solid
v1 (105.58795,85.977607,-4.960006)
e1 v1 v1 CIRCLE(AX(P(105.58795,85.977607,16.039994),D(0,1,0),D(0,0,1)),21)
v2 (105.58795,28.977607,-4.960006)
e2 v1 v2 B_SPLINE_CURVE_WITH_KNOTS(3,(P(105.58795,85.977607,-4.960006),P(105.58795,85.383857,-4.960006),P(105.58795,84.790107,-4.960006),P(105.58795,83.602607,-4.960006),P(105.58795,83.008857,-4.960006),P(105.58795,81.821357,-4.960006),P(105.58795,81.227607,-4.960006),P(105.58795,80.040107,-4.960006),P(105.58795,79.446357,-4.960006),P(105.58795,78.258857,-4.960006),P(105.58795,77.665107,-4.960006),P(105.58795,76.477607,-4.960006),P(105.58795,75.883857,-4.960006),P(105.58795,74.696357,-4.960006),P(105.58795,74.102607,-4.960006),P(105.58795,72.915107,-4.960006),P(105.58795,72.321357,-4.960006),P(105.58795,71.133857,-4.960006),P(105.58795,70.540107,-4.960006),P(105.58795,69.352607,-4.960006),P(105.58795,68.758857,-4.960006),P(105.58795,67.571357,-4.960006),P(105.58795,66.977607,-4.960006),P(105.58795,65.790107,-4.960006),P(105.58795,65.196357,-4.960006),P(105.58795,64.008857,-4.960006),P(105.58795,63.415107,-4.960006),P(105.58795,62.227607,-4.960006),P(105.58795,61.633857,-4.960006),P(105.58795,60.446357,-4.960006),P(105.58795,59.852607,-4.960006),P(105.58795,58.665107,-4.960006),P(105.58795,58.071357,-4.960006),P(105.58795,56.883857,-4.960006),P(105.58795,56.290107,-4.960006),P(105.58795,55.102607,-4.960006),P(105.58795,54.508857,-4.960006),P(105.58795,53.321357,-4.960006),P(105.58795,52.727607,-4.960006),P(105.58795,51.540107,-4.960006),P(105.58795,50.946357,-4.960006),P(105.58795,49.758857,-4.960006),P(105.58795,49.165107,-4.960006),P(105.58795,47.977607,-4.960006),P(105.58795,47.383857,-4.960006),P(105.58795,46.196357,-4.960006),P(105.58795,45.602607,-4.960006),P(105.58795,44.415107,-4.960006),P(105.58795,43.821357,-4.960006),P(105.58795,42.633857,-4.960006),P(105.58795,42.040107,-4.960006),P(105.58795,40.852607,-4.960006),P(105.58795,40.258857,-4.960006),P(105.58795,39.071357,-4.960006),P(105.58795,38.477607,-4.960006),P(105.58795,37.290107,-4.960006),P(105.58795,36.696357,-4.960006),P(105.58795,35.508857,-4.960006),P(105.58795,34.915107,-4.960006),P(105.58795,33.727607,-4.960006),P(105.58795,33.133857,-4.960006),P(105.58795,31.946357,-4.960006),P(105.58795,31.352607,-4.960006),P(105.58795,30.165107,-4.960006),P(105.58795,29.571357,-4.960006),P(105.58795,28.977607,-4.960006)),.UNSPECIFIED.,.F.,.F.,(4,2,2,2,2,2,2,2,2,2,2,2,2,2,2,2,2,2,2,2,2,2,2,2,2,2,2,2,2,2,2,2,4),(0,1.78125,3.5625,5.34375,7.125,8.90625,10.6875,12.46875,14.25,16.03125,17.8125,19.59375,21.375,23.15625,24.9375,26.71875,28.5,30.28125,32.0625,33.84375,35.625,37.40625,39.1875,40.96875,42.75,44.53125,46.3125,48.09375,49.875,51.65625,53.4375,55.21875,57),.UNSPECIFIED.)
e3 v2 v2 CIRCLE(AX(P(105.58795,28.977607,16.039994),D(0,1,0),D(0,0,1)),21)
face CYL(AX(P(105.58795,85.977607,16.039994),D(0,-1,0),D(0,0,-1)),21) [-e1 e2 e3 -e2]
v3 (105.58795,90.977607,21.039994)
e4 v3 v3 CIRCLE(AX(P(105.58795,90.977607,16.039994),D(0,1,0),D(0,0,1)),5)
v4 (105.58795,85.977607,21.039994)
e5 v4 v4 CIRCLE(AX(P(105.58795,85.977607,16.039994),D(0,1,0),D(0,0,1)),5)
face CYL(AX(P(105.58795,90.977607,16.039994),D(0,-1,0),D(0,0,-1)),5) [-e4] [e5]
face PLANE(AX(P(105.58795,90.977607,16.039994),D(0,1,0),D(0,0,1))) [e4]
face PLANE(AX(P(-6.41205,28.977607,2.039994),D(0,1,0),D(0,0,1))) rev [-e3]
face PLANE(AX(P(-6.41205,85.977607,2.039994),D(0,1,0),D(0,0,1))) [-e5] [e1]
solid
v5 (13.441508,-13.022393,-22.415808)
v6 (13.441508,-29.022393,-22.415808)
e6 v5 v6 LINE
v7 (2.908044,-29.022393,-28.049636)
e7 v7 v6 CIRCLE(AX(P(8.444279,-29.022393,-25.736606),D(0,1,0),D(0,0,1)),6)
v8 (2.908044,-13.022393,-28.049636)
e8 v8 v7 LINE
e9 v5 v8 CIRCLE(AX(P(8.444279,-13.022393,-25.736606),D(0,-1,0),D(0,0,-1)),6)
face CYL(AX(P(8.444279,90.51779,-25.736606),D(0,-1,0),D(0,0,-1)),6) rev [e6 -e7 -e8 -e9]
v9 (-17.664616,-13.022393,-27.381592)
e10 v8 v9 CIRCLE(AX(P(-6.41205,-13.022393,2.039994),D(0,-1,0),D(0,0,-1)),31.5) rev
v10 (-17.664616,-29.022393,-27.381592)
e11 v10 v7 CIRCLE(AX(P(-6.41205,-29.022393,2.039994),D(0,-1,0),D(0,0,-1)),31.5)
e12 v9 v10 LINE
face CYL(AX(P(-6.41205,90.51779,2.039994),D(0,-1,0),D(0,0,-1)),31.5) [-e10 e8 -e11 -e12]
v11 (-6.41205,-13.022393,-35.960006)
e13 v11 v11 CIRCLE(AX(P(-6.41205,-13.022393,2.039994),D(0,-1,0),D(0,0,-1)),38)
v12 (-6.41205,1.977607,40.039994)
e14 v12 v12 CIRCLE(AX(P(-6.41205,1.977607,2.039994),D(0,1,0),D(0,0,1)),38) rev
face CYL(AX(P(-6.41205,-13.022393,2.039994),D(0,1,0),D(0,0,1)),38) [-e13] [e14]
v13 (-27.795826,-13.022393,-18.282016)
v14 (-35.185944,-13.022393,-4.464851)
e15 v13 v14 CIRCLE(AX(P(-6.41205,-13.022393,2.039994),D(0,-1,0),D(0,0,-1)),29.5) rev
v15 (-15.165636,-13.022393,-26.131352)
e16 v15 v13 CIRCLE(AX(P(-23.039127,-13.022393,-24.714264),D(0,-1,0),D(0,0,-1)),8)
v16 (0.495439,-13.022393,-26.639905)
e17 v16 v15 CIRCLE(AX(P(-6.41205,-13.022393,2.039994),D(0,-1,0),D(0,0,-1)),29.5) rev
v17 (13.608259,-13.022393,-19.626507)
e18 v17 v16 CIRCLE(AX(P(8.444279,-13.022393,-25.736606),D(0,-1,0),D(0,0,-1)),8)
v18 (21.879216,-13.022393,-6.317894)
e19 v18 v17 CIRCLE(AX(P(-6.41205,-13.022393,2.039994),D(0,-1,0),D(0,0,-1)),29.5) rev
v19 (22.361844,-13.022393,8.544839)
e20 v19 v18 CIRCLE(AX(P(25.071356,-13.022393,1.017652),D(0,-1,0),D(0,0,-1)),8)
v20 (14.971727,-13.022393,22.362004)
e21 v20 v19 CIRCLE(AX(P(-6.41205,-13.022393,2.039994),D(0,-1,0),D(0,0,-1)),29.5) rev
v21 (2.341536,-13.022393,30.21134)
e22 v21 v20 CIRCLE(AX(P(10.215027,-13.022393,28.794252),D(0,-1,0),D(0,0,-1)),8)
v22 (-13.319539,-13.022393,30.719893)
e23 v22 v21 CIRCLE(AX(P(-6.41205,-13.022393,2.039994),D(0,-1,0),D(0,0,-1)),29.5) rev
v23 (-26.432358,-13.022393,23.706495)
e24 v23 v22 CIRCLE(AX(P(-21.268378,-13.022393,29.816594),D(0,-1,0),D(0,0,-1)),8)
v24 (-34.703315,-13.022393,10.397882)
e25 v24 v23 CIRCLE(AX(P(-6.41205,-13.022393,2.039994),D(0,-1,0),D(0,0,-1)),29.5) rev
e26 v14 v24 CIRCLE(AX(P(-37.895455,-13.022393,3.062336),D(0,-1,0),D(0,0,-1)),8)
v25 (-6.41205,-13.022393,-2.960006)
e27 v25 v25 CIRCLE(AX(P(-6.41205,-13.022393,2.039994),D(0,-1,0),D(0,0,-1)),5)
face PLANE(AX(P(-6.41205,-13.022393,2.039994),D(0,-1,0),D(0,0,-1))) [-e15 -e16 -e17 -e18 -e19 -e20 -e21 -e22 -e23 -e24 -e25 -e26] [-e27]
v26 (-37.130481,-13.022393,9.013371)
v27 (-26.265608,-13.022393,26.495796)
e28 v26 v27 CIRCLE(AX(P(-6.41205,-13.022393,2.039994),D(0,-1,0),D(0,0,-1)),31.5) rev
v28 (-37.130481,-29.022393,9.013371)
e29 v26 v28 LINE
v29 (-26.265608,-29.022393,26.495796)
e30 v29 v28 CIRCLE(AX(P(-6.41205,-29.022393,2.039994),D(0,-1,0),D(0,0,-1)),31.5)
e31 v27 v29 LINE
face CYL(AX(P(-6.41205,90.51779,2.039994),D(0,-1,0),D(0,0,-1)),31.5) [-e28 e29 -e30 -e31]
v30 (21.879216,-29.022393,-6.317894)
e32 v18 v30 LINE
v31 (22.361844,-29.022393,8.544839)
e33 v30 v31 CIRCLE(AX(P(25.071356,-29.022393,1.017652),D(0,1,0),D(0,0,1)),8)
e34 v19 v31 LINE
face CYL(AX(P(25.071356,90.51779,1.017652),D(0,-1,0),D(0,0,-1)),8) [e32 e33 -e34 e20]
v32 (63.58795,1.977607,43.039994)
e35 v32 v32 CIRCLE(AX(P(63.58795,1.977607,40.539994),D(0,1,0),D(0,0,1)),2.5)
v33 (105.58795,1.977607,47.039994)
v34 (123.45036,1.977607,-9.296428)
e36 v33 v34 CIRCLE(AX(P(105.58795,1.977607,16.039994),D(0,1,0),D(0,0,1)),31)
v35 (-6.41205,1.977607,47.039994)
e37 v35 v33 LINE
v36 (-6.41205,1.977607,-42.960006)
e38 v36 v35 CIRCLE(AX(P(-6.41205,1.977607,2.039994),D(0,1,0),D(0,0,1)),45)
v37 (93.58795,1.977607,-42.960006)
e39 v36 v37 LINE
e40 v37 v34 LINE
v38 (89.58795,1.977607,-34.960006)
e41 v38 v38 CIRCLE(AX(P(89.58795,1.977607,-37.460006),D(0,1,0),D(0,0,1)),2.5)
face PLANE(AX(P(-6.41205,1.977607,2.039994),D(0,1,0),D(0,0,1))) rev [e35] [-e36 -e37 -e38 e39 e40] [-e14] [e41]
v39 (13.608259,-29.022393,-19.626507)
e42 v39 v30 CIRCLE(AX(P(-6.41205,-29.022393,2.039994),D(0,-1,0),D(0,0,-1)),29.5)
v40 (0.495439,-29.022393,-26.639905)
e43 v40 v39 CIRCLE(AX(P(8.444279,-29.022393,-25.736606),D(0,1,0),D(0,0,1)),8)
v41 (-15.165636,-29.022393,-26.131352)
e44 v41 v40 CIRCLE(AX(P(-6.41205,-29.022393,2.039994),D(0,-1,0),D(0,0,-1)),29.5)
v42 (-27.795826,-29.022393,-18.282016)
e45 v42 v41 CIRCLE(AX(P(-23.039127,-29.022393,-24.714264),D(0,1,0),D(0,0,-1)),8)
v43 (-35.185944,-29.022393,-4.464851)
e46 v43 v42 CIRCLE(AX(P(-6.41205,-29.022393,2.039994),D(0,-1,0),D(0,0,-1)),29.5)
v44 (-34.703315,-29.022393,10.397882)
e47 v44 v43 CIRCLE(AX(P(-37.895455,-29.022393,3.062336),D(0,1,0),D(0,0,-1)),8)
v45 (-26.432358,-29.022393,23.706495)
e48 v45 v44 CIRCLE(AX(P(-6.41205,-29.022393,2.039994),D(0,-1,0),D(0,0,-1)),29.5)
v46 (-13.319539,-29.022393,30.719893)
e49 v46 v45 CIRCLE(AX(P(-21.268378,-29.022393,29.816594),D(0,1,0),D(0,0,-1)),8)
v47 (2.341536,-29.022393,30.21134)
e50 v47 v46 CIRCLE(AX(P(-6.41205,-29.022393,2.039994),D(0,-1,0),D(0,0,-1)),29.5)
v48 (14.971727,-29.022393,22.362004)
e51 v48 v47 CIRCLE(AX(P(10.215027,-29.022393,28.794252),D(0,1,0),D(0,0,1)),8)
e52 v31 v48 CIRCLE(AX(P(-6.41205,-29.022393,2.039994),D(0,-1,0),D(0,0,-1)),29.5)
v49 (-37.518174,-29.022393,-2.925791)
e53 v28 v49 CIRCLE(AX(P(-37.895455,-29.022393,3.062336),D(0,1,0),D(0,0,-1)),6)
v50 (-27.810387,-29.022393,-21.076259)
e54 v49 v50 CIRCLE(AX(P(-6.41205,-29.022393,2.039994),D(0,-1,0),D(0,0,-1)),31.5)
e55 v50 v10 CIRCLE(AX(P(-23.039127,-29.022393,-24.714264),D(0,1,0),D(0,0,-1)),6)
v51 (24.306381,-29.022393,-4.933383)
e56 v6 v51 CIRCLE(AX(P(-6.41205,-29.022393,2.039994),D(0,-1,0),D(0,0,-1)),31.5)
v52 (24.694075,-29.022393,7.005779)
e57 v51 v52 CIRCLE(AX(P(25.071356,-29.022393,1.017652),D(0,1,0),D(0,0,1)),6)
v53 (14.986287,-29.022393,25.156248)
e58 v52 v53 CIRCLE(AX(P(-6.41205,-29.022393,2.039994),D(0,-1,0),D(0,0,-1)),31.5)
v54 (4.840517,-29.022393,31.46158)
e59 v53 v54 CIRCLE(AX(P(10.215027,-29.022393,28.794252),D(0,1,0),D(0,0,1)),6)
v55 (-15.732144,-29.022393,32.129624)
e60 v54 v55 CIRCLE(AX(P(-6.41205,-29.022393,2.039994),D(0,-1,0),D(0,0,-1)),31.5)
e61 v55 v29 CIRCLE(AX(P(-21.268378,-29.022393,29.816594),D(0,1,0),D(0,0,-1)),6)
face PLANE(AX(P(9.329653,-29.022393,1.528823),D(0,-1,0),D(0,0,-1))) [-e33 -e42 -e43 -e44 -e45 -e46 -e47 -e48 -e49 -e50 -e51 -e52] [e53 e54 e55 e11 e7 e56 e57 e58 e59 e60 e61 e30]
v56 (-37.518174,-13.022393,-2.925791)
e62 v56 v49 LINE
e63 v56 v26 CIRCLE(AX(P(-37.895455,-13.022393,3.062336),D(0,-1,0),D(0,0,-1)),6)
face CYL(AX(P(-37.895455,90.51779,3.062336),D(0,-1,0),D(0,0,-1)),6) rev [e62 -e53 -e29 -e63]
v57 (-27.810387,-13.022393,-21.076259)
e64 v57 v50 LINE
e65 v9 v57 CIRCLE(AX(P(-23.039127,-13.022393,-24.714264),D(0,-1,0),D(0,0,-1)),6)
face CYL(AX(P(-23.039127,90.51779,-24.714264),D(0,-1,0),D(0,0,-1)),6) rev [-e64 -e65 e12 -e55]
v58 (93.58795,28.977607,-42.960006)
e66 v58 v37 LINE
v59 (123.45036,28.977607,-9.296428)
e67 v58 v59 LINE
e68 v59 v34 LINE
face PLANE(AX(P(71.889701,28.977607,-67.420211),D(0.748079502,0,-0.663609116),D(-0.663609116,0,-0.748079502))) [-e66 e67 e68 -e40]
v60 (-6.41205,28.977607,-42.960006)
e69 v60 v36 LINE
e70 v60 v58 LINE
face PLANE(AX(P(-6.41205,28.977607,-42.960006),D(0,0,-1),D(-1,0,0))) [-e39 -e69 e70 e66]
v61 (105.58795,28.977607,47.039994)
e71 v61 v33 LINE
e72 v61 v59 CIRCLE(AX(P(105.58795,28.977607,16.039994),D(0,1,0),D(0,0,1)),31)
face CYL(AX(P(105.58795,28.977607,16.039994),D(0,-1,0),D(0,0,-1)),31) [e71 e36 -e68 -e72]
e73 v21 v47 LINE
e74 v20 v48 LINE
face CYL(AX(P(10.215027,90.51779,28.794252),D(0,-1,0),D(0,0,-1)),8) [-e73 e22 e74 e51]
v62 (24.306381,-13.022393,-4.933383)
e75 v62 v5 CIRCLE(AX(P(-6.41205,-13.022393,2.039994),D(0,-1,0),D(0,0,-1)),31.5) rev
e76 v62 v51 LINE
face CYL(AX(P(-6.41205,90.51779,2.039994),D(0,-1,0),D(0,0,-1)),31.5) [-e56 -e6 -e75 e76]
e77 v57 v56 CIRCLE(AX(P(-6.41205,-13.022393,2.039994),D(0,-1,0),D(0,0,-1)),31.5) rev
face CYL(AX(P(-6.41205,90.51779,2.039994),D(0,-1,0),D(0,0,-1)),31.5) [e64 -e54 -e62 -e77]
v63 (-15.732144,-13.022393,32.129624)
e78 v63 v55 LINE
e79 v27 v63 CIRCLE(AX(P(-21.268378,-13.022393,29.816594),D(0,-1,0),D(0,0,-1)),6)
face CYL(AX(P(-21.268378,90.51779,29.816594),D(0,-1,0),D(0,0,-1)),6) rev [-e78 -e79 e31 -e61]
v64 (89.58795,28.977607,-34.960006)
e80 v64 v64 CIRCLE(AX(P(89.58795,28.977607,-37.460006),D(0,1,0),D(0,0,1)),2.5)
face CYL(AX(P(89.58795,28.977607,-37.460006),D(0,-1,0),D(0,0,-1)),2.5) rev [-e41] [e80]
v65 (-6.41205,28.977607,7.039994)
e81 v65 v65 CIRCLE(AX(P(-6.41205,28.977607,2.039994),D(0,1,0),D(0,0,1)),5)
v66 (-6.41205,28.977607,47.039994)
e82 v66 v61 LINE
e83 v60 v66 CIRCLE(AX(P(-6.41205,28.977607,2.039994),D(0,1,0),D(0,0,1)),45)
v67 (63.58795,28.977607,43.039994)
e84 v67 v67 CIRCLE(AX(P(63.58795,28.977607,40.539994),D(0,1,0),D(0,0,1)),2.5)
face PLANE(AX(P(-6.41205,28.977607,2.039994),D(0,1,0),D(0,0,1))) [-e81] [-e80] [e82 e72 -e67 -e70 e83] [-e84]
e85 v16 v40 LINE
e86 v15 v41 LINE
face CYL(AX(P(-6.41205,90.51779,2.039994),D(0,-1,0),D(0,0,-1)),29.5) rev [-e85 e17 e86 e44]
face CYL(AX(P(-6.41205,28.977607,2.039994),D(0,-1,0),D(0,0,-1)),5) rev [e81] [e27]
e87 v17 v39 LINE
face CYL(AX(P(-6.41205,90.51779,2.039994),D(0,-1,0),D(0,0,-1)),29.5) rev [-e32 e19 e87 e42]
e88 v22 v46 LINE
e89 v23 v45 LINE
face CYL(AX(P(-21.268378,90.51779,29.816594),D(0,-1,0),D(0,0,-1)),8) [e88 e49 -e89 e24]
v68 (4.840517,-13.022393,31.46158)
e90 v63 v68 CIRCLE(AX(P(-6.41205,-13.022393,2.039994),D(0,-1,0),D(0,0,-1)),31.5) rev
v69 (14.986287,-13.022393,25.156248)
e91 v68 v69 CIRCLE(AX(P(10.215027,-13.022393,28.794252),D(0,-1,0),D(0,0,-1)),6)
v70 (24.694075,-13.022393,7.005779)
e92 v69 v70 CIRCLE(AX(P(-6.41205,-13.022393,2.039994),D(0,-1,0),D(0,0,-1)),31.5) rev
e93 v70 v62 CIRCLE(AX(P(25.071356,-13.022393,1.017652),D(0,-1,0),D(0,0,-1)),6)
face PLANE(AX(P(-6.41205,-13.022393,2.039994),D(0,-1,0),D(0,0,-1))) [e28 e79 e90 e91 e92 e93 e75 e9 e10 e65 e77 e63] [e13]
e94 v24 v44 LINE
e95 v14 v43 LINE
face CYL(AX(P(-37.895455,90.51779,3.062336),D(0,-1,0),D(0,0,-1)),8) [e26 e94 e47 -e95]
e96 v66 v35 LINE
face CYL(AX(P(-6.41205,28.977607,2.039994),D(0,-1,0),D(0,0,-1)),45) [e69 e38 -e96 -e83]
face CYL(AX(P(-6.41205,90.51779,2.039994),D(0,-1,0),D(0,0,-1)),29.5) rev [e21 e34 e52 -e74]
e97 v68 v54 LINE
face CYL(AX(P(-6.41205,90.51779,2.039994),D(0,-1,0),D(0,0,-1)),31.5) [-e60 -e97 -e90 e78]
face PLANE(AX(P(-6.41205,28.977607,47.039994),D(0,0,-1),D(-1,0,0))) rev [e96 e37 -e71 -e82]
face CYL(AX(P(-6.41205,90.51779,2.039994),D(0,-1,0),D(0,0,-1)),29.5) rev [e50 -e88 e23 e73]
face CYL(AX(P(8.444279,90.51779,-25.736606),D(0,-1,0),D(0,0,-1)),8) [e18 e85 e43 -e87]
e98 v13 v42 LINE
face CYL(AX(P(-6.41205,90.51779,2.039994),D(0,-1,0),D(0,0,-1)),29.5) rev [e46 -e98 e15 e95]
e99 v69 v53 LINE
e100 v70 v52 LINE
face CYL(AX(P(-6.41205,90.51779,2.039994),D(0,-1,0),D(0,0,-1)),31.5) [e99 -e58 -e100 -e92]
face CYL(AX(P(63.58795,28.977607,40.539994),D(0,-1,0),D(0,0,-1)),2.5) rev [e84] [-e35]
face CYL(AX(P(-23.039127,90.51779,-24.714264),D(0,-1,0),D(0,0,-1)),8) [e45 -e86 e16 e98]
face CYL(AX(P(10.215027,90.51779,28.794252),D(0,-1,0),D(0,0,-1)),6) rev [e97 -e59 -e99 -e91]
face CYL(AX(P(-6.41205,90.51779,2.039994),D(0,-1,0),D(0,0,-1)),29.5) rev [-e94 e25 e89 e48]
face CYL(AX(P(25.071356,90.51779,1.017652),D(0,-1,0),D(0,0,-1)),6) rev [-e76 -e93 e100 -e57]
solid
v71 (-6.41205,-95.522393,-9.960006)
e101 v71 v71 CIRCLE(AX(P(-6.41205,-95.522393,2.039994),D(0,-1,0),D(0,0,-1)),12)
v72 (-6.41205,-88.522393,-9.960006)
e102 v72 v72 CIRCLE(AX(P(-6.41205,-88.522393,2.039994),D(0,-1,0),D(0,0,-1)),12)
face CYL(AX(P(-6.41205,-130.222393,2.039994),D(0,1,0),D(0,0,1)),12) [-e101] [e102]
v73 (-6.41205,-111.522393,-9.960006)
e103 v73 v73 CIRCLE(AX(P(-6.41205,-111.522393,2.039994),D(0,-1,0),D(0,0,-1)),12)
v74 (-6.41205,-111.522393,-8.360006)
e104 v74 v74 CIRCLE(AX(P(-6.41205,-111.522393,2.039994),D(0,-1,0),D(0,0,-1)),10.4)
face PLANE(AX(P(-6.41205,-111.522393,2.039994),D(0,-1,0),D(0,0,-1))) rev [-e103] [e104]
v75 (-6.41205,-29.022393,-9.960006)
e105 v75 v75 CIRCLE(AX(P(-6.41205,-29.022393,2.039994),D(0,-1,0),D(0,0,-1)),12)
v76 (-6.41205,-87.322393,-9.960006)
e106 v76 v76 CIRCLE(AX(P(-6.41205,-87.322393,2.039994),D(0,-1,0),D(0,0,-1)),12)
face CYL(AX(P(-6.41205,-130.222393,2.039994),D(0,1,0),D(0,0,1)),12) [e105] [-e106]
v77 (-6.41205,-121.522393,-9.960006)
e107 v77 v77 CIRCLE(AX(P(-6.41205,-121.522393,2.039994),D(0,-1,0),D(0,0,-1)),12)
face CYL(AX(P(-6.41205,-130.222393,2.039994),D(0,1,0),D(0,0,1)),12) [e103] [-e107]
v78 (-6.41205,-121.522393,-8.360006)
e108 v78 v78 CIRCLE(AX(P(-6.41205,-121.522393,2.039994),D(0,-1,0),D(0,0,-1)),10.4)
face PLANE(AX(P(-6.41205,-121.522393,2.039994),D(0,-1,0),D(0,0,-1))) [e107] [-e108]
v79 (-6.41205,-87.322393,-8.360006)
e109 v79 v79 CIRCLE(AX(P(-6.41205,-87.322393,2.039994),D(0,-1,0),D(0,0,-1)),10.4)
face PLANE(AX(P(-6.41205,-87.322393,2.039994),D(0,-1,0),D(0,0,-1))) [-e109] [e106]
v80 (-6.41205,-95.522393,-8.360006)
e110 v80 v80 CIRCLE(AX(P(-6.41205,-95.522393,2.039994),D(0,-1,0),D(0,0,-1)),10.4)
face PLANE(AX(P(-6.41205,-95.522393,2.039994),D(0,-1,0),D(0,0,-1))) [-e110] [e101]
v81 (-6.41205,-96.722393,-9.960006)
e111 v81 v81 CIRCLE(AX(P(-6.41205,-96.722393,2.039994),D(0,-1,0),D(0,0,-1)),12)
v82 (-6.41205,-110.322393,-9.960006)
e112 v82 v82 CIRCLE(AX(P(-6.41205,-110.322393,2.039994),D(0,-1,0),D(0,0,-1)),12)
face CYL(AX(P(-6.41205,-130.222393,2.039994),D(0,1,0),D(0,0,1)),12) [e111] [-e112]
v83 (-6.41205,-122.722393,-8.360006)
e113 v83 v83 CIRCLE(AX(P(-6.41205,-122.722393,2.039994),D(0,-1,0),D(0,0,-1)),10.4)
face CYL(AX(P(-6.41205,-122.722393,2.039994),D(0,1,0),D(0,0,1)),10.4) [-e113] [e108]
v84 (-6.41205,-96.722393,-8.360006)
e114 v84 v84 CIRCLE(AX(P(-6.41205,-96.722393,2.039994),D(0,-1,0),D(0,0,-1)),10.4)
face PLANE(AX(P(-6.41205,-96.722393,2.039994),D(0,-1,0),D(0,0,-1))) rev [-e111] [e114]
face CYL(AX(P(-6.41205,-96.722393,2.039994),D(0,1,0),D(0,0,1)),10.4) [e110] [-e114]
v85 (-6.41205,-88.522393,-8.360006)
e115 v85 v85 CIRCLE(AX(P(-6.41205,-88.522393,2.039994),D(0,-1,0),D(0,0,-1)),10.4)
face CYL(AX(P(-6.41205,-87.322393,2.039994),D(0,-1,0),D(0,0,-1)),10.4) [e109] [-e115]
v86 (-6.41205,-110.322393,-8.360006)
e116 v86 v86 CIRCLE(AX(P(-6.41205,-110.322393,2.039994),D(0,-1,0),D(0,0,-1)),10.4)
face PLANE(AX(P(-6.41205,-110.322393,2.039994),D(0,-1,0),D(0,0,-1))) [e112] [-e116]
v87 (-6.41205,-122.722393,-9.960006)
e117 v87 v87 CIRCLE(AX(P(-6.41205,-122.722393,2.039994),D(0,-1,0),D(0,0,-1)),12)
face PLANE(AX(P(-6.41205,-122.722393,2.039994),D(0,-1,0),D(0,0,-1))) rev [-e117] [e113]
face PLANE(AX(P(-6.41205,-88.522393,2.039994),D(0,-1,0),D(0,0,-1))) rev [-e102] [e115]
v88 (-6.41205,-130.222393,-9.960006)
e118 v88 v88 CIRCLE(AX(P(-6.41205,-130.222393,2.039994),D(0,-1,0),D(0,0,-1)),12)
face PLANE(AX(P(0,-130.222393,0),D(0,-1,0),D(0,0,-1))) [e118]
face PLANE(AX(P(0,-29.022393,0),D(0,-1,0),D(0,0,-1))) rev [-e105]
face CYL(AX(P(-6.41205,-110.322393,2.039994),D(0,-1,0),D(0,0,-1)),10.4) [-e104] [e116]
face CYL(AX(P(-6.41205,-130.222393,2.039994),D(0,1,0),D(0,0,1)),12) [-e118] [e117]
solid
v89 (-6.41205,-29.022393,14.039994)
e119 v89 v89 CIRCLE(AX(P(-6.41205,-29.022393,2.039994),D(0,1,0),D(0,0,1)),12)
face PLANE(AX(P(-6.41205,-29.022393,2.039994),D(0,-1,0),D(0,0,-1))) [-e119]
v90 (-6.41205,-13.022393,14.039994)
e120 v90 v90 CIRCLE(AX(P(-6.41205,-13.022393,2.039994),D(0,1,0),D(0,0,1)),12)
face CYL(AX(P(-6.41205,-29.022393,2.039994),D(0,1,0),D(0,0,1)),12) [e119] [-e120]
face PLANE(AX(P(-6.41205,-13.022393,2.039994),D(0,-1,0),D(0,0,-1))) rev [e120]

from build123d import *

# Parameters (mm, degrees)
GEAR_START                  = 1.977607415
GEAR_BOX_LEFT_OUTLINE_R     = 2.5
GEAR_BOX_LEFT_OUTLINE_R_2   = 5
GEAR_BOX_LEFT_DEPTH         = 27
GEAR_START_2                = -13.022392585
GEAR_BOX_LEFT_2_OUTLINE_R   = 38
GEAR_BOX_LEFT_2_OUTLINE_R_2 = 5
GEAR_BOX_LEFT_2_DEPTH       = 15
GEAR_START_3                = -29.022392585
GEAR_BOX_LEFT_3_DEPTH       = 16
GEAR_START_4                = 28.977607415
GEAR_BOX_LEFT_4_OUTLINE_R   = 21
GEAR_BOX_LEFT_4_DEPTH       = 57
GEAR_START_5                = 85.977607415
GEAR_BOX_LEFT_5_OUTLINE_R   = 5
GEAR_BOX_LEFT_5_DEPTH       = 5
SKETCH1_R                   = 23.5
BOSS_EXTRUDE1_DEPTH         = 16
SKETCH2_R                   = 12
BOSS_EXTRUDE2_DEPTH         = 101.2
SKETCH3_R                   = 12
SKETCH3_R_2                 = 10.4
CUT_EXTRUDE1_DEPTH          = 1.2
SKETCH4_R                   = 12
SKETCH4_R_2                 = 10.4
CUT_EXTRUDE2_DEPTH          = 1.2
SKETCH7_R                   = 12
SKETCH7_R_2                 = 10.4
CUT_EXTRUDE4_DEPTH          = 1.2
SKETCH8_R                   = 12
SKETCH8_R_2                 = 10.4
CUT_EXTRUDE5_DEPTH          = 1.2
SKETCH26_R                  = 24.974470238
SKETCH26_R_2                = 12
CUT_EXTRUDE16_DEPTH         = 16


# Read off the part's stored shape, not the designer's step: Gear Box_Left
with BuildPart() as part:
    # Gear Box_Left outline → Gear Box_Left (new body)
    with BuildSketch(Plane(origin=(0, 0, 0), x_dir=(1, 0, 0), z_dir=(0, 1, 0)).offset(GEAR_START)):
        with BuildLine():
            Line((-6.41204983, -47.039994013), (105.58795017, -47.039994013))
            ThreePointArc((105.58795017, -47.039994013), (135.138154019, -25.409383135), (123.450360395, 9.296428405))
            Line((123.450360395, 9.296428405), (93.58795017, 42.960005987))
            Line((93.58795017, 42.960005987), (-6.41204983, 42.960005987))
            ThreePointArc((-6.41204983, 42.960005987), (-51.41204983, -2.039994013), (-6.41204983, -47.039994013))
        make_face()
        with Locations((63.58795017, -40.539994013)):
            Circle(GEAR_BOX_LEFT_OUTLINE_R, mode=Mode.SUBTRACT)
        with Locations((89.58795017, 37.460005987)):
            Circle(GEAR_BOX_LEFT_OUTLINE_R, mode=Mode.SUBTRACT)
        with Locations((-6.41204983, -2.039994013)):
            Circle(GEAR_BOX_LEFT_OUTLINE_R_2, mode=Mode.SUBTRACT)
    extrude(amount=GEAR_BOX_LEFT_DEPTH)

    # Gear Box_Left 2 outline → Gear Box_Left 2 (add)
    with BuildSketch(Plane(origin=(0, 0, 0), x_dir=(1, 0, 0), z_dir=(0, 1, 0)).offset(GEAR_START_2)):
        with Locations((-6.41204983, -2.039994013)):
            Circle(GEAR_BOX_LEFT_2_OUTLINE_R)
        with Locations((-6.41204983, -2.039994013)):
            Circle(GEAR_BOX_LEFT_2_OUTLINE_R_2, mode=Mode.SUBTRACT)
    extrude(amount=GEAR_BOX_LEFT_2_DEPTH)

    # Gear Box_Left 3 outline → Gear Box_Left 3 (add)
    with BuildSketch(Plane(origin=(0, 0, 0), x_dir=(1, 0, 0), z_dir=(0, 1, 0)).offset(GEAR_START_3)):
        with BuildLine():
            ThreePointArc((14.98628711, -25.156247521), (21.36455001, -16.896322675), (24.694074697, -7.005778634))
            ThreePointArc((24.694074697, -7.005778634), (19.074516465, -1.21238391), (24.306381418, 4.933382621))
            ThreePointArc((24.306381418, 4.933382621), (20.342208118, 14.587082747), (13.441508065, 22.41580773))
            ThreePointArc((13.441508065, 22.41580773), (5.614501944, 20.445824905), (2.908044478, 28.049636129))
            ThreePointArc((2.908044478, 28.049636129), (-7.434391722, 29.44341141), (-17.664616463, 27.381592351))
            ThreePointArc((-17.664616463, 27.381592351), (-19.872064351, 19.618214802), (-27.81038677, 21.076259494))
            ThreePointArc((-27.81038677, 21.076259494), (-34.18864967, 12.816334649), (-37.518174357, 2.925790607))
            ThreePointArc((-37.518174357, 2.925790607), (-31.898616125, -2.867604117), (-37.130481078, -9.013370648))
            ThreePointArc((-37.130481078, -9.013370648), (-33.166307778, -18.667070774), (-26.265607725, -26.495795757))
            ThreePointArc((-26.265607725, -26.495795757), (-18.438601604, -24.525812932), (-15.732144138, -32.129624156))
            ThreePointArc((-15.732144138, -32.129624156), (-5.389707938, -33.523399437), (4.840516803, -31.461580377))
            ThreePointArc((4.840516803, -31.461580377), (7.047964692, -23.698202829), (14.98628711, -25.156247521))
        make_face()
        with BuildLine():
            ThreePointArc((0.495439231, 26.639904781), (4.671242981, 18.682231264), (13.608258638, 19.6265066))
            ThreePointArc((13.608258638, 19.6265066), (18.643525074, 13.531395335), (21.879215635, 6.317894381))
            ThreePointArc((21.879215635, 6.317894381), (17.075570089, -1.277294507), (22.361844347, -8.544839432))
            ThreePointArc((22.361844347, -8.544839432), (19.60095637, -15.953063713), (14.971726573, -22.362004414))
            ThreePointArc((14.971726573, -22.362004414), (5.992277277, -21.999519784), (2.341535878, -30.211340045))
            ThreePointArc((2.341535878, -30.211340045), (-5.454618534, -31.524453061), (-13.319538891, -30.719892808))
            ThreePointArc((-13.319538891, -30.719892808), (-17.495342641, -22.762219291), (-26.432358298, -23.706494627))
            ThreePointArc((-26.432358298, -23.706494627), (-31.467624734, -17.611383361), (-34.703315295, -10.397882407))
            ThreePointArc((-34.703315295, -10.397882407), (-29.899669749, -2.80269352), (-35.185944007, 4.464851405))
            ThreePointArc((-35.185944007, 4.464851405), (-32.42505603, 11.873075686), (-27.795826233, 18.282016387))
            ThreePointArc((-27.795826233, 18.282016387), (-18.816376938, 17.919531758), (-15.165635538, 26.131352018))
            ThreePointArc((-15.165635538, 26.131352018), (-7.369481126, 27.444465034), (0.495439231, 26.639904781))
        make_face(mode=Mode.SUBTRACT)
    extrude(amount=GEAR_BOX_LEFT_3_DEPTH)


with BuildPart() as body_2:
    # Gear Box_Left 4 outline → Gear Box_Left 4 (new body)
    with BuildSketch(Plane(origin=(0, 0, 0), x_dir=(1, 0, 0), z_dir=(0, 1, 0)).offset(GEAR_START_4)):
        with Locations((105.58795017, -16.039994013)):
            Circle(GEAR_BOX_LEFT_4_OUTLINE_R)
    extrude(amount=GEAR_BOX_LEFT_4_DEPTH)

    # Gear Box_Left 5 outline → Gear Box_Left 5 (add)
    with BuildSketch(Plane(origin=(0, 0, 0), x_dir=(1, 0, 0), z_dir=(0, 1, 0)).offset(GEAR_START_5)):
        with Locations((105.58795017, -16.039994013)):
            Circle(GEAR_BOX_LEFT_5_OUTLINE_R)
    extrude(amount=GEAR_BOX_LEFT_5_DEPTH)


with BuildPart() as body_3:
    # Sketch1 → Boss-Extrude1 (new body)
    with BuildSketch(Plane.XZ.offset(13.022392585)):
        with Locations(Location((-6.41204983, 2.039994013, 0), (0, 0, 270))):
            Circle(SKETCH1_R)
    extrude(amount=BOSS_EXTRUDE1_DEPTH)

    # Sketch26 → Cut-Extrude16 (cut)
    with BuildSketch(Plane(origin=(0, -13.022392585, 0), x_dir=(1, 0, 0), z_dir=(0, 1, 0))):
        with Locations((-6.41204983, -2.039994013)):
            Circle(SKETCH26_R)
        with Locations(Location((-6.41204983, -2.039994013, 0), (0, 0, 90))):
            Circle(SKETCH26_R_2, mode=Mode.SUBTRACT)
    extrude(amount=-CUT_EXTRUDE16_DEPTH, mode=Mode.SUBTRACT)


with BuildPart() as body_4:
    # Sketch2 → Boss-Extrude2 (new body)
    with BuildSketch(Plane.XZ.offset(29.022392585)):
        with Locations(Location((-6.41204983, 2.039994013, 0), (0, 0, 270))):
            Circle(SKETCH2_R)
    extrude(amount=BOSS_EXTRUDE2_DEPTH)

    # Sketch3 → Cut-Extrude1 (cut)
    with BuildSketch(Plane(origin=(0, -88.522392585, 0), x_dir=(-1, 0, 0), z_dir=(0, -1, 0))):
        with Locations(Location((6.41204983, -2.039994013, 0), (0, 0, 90))):
            Circle(SKETCH3_R)
        with Locations(Location((6.41204983, -2.039994013, 0), (0, 0, 90))):
            Circle(SKETCH3_R_2, mode=Mode.SUBTRACT)
    extrude(amount=-CUT_EXTRUDE1_DEPTH, mode=Mode.SUBTRACT)

    # Sketch4 → Cut-Extrude2 (cut)
    with BuildSketch(Plane(origin=(0, -95.522392585, 0), x_dir=(-1, 0, 0), z_dir=(0, -1, 0))):
        with Locations(Location((6.41204983, -2.039994013, 0), (0, 0, 90))):
            Circle(SKETCH4_R)
        with Locations(Location((6.41204983, -2.039994013, 0), (0, 0, 90))):
            Circle(SKETCH4_R_2, mode=Mode.SUBTRACT)
    extrude(amount=CUT_EXTRUDE2_DEPTH, mode=Mode.SUBTRACT)

    # Sketch7 → Cut-Extrude4 (cut)
    with BuildSketch(Plane(origin=(0, -111.522392585, 0), x_dir=(-1, 0, 0), z_dir=(0, -1, 0))):
        with Locations(Location((6.41204983, -2.039994013, 0), (0, 0, 90))):
            Circle(SKETCH7_R)
        with Locations(Location((6.41204983, -2.039994013, 0), (0, 0, 90))):
            Circle(SKETCH7_R_2, mode=Mode.SUBTRACT)
    extrude(amount=-CUT_EXTRUDE4_DEPTH, mode=Mode.SUBTRACT)

    # Sketch8 → Cut-Extrude5 (cut)
    with BuildSketch(Plane(origin=(0, -121.522392585, 0), x_dir=(-1, 0, 0), z_dir=(0, -1, 0))):
        with Locations(Location((6.41204983, -2.039994013, 0), (0, 0, 90))):
            Circle(SKETCH8_R)
        with Locations(Location((6.41204983, -2.039994013, 0), (0, 0, 90))):
            Circle(SKETCH8_R_2, mode=Mode.SUBTRACT)
    extrude(amount=CUT_EXTRUDE5_DEPTH, mode=Mode.SUBTRACT)


solid = Compound([part.part, body_2.part, body_3.part, body_4.part])
